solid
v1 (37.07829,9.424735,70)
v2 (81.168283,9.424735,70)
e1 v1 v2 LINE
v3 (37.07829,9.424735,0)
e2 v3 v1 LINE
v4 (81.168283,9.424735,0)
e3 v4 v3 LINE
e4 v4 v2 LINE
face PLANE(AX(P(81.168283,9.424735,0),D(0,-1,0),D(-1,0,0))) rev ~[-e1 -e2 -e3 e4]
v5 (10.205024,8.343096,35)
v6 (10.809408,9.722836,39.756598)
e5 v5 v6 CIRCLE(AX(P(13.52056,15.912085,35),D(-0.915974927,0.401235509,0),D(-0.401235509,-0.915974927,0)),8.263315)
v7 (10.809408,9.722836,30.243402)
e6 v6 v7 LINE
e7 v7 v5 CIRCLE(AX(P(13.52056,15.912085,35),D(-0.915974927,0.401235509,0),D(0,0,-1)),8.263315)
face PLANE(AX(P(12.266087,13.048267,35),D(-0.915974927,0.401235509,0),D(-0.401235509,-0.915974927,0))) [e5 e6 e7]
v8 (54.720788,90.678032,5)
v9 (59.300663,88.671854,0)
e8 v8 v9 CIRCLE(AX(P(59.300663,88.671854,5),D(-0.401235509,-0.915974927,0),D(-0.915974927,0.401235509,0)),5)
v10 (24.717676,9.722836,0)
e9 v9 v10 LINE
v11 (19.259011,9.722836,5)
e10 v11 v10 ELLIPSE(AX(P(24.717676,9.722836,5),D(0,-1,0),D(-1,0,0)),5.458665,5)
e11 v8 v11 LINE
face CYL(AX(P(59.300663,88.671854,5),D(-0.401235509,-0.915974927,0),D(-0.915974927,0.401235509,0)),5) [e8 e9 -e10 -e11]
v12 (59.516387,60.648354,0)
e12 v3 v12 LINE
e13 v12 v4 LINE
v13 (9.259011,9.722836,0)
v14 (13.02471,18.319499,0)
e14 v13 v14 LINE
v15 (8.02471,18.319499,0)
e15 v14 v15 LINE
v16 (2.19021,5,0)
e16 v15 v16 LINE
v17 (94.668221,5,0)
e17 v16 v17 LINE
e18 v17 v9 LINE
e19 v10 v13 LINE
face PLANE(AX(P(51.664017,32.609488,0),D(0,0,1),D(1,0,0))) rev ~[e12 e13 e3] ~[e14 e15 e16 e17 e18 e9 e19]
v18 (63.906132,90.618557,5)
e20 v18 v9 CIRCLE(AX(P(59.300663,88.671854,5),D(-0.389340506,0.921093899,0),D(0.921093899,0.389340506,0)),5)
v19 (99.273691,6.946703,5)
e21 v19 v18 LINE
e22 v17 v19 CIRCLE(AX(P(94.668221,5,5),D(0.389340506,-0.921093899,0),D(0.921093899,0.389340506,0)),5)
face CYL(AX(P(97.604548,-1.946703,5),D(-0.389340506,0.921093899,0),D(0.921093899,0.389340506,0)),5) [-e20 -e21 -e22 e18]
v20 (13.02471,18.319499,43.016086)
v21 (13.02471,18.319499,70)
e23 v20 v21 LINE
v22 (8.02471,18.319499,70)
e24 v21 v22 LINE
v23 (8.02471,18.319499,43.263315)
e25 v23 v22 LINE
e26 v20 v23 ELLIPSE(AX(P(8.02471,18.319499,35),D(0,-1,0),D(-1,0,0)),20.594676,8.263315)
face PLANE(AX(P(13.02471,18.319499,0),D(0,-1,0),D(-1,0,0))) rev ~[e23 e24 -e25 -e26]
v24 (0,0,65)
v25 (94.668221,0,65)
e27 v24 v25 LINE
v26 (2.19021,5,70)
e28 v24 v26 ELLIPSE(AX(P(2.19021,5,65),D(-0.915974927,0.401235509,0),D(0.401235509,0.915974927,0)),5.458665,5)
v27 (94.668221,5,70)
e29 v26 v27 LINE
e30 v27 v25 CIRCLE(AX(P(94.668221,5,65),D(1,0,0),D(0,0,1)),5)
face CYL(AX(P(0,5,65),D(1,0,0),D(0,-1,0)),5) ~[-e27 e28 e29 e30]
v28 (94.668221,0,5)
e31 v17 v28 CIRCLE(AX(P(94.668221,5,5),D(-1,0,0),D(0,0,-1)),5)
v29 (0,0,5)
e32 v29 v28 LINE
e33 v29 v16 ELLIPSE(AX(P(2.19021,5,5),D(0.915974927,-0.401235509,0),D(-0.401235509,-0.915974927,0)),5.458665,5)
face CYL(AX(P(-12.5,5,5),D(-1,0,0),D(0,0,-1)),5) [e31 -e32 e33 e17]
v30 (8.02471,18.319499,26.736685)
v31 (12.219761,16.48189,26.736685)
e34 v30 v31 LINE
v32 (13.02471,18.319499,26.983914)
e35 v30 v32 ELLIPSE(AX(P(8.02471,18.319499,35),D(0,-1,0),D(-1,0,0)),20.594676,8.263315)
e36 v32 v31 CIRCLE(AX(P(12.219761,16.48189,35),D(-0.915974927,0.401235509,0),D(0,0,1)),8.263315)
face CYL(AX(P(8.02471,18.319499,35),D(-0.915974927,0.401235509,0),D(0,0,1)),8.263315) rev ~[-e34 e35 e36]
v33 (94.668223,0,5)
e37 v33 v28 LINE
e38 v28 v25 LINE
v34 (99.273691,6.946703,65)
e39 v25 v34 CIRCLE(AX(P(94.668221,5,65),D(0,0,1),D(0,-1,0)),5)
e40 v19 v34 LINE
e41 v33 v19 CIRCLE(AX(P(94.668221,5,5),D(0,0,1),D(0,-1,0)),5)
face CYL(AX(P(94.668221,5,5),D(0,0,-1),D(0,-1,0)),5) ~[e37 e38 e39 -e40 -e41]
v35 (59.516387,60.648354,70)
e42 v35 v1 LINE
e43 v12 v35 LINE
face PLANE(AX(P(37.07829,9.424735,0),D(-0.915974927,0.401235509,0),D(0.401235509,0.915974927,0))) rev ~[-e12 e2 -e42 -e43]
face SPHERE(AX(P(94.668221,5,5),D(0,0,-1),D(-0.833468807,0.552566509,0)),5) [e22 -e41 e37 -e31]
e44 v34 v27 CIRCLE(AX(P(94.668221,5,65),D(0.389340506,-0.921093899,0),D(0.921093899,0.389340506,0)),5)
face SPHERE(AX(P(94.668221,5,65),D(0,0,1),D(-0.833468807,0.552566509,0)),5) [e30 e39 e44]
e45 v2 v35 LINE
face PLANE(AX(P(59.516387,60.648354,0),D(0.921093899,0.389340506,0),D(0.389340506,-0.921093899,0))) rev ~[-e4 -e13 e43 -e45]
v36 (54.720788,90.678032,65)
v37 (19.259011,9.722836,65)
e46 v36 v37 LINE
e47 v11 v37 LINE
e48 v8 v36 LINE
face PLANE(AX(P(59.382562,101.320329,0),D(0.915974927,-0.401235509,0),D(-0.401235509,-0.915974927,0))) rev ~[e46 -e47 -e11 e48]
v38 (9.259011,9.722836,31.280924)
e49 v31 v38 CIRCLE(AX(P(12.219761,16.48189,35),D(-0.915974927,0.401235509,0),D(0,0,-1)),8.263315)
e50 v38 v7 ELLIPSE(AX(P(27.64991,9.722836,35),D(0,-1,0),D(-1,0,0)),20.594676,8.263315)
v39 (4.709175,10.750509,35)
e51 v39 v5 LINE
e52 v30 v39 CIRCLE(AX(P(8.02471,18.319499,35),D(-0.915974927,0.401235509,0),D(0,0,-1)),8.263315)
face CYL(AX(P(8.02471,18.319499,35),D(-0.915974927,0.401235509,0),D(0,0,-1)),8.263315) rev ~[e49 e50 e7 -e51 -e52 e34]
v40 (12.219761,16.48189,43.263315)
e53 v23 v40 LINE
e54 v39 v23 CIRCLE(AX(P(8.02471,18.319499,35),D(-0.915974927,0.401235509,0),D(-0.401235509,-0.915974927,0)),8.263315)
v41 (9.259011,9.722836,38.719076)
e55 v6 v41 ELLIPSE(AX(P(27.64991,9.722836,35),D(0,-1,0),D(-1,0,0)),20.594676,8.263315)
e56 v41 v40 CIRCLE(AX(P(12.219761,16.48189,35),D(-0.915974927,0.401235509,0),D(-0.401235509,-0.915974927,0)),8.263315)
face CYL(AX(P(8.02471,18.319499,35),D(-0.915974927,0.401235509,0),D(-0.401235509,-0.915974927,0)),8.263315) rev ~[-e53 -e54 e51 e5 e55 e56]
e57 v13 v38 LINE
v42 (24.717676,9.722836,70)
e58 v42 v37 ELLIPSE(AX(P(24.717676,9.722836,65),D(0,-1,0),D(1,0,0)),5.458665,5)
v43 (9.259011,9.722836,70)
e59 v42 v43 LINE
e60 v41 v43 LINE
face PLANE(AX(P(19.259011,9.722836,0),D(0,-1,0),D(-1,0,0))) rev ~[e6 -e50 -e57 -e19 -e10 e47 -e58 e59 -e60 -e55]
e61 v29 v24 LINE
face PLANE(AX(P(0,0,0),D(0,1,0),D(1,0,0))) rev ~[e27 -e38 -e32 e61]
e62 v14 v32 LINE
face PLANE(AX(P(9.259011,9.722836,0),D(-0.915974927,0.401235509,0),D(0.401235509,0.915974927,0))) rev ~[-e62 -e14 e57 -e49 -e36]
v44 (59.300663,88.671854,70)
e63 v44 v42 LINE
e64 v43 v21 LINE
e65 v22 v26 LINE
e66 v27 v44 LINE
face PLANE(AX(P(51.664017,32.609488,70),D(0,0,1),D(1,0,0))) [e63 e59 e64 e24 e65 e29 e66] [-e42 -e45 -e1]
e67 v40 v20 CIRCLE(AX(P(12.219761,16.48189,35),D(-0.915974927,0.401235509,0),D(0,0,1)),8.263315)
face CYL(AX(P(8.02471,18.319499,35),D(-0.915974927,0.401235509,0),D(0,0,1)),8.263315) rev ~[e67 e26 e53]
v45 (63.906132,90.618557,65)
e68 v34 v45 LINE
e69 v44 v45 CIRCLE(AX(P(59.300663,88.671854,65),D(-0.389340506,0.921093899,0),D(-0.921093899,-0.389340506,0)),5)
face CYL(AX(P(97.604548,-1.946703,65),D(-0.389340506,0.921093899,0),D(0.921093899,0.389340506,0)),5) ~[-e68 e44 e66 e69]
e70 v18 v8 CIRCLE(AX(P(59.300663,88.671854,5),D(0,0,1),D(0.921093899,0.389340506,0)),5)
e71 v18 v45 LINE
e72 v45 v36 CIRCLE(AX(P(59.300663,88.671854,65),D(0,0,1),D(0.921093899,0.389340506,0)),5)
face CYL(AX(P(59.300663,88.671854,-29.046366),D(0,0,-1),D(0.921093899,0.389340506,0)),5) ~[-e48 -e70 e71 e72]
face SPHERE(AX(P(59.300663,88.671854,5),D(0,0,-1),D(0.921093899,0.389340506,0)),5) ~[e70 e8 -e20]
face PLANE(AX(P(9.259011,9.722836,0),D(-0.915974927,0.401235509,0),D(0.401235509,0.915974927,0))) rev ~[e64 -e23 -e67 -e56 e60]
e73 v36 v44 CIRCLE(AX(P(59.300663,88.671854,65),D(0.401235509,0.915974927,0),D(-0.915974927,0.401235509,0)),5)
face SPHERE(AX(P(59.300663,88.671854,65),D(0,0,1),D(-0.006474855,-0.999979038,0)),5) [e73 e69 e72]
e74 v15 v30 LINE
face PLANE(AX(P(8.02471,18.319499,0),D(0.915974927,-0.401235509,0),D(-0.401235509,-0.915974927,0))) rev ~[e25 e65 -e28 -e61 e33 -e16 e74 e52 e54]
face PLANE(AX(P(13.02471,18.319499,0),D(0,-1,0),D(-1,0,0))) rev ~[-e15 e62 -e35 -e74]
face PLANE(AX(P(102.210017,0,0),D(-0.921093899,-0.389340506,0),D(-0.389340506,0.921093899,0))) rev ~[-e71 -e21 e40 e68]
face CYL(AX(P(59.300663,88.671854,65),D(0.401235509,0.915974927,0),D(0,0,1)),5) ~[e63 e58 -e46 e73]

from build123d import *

# Parameters (mm, degrees)
F1_DEPTH     = 70
F2_R         = 5
F3_T1_DEPTH  = 94.0463660375
F3_T6_DEPTH  = 5
F3_T12_DEPTH = 100.881453585
F4_R         = 5
F5_T1_DEPTH  = 107.1682211358
F5_T3_DEPTH  = 60
F5_T8_DEPTH  = 5
F5_T14_DEPTH = 5
F7_DEPTH     = 6
F9_DEPTH     = 70.001


# Not quite as in the source:
# - a fillet or chamfer that OpenCascade refuses, or shapes differently, is made with other operations: its cross-section is extruded or revolved along the edge and cut away or added


with BuildPart() as f1:
    # F0 (on Top) → F1 (new body)
    with BuildSketch(Plane.XY):
        Polygon((8.0247101811, 18.3194985333), (0, 0), (102.2100174067, 0), (59.3825617324, 101.3203288608), (19.2590108271, 9.7228361946), (9.2590108271, 9.7228361946), (13.0247101811, 18.3194985333), align=None)
    extrude(amount=F1_DEPTH)

    # F2
    f2_edges = [f1.edges().sort_by_distance(p)[0] for p in [
        (80.79629, 50.660164, 70),
        (51.105009, 0, 70),
    ]]
    fillet(f2_edges, radius=F2_R)

    # F3: fillet of radius 5 on 2 edges, made by hand

    # F3_s2 → F3_t1 (cut)
    with BuildSketch(Plane.XY.offset(-29.0463660375)):
        with BuildLine():
            ThreePointArc((63.9061324741, 90.6185566458), (59.3330372536, 93.6717493047), (54.7207883471, 90.6780316604))
            Line((54.7207883471, 90.6780316604), (59.3825617324, 101.3203288608))
            Line((59.3825617324, 101.3203288608), (63.9061324741, 90.6185566458))
        make_face()
    extrude(amount=F3_T1_DEPTH, mode=Mode.SUBTRACT)


with BuildPart() as f3_tool4:
    # F3_s5 → F3_t6 (new body)
    with BuildSketch(Plane.XY.offset(65)):
        Polygon((59.3006629805, 88.6718541152), (63.9061324741, 90.6185566458), (59.3825617324, 101.3203288608), (54.7207883471, 90.6780316604), align=None)
    extrude(amount=F3_T6_DEPTH)

    # F3_s7 → F3_t8 (revolve, cut)
    with BuildSketch(Plane(origin=(59.3006629805, 88.6718541152, 65), x_dir=(-0.0064748546, -0.9999790379, 0), z_dir=(-0.9999790379, 0.0064748546, 0))):
        with BuildLine():
            ThreePointArc((0, -5), (5, 0), (0, 5))
            Line((0, 5), (0, -5))
        make_face()
    revolve(axis=Axis((59.3006629805, 88.6718541152, 65), (0, 0, 1)), mode=Mode.SUBTRACT)


with BuildPart() as f1_1:
    add(f1.part)

    # F3_t3: cut F3_tool4
    add(f3_tool4.part, mode=Mode.SUBTRACT)


with BuildPart() as f3_tool10:
    # F3_s11 → F3_t12 (new body)
    with BuildSketch(Plane(origin=(42.135637353, 96.1908566501, 0), x_dir=(0, 0, 1), z_dir=(-0.4012355091, -0.9159749267, 0))):
        with BuildLine():
            ThreePointArc((70, -18.7396238999), (68.5355339059, -15.204089994), (65, -13.7396238999))
            Line((65, -13.7396238999), (70, -13.7396238999))
            Line((70, -13.7396238999), (70, -18.7396238999))
        make_face()
    extrude(amount=F3_T12_DEPTH)

    split(bisect_by=Plane.XZ.offset(-9.7228361946), keep=Keep.BOTTOM)


with BuildPart() as f1_2:
    add(f1_1.part)

    # F3_t9: cut F3_tool10
    add(f3_tool10.part, mode=Mode.SUBTRACT)

    # F4
    f4_edges = [f1_2.edges().sort_by_distance(p)[0] for p in [
        (83.058075, 45.309278, 0),
        (36.9899, 50.200434, 0),
    ]]
    fillet(f4_edges, radius=F4_R)

    # F5: fillet of radius 5 on 1 edges, made by hand

    # F5_s2 → F5_t1 (cut)
    with BuildSketch(Plane.YZ.offset(-12.5)):
        with BuildLine():
            ThreePointArc((5, 0), (1.4644660941, 1.4644660941), (0, 5))
            Line((0, 5), (0, 0))
            Line((0, 0), (5, 0))
        make_face()
    extrude(amount=F5_T1_DEPTH, mode=Mode.SUBTRACT)

    # F5_s4 → F5_t3 (cut)
    with BuildSketch(Plane.XY.offset(5)):
        with BuildLine():
            ThreePointArc((94.6682211358, 0), (98.8355651733, 2.2371674547), (99.2736906295, 6.9467025307))
            Line((99.2736906295, 6.9467025307), (102.2100174067, 0))
            Line((102.2100174067, 0), (94.6682211358, 0))
        make_face()
    extrude(amount=F5_T3_DEPTH, mode=Mode.SUBTRACT)


with BuildPart() as f5_tool6:
    # F5_s7 → F5_t8 (new body)
    with BuildSketch(Plane.XY.offset(65)):
        Polygon((94.6682211358, 5), (94.6682211358, 0), (102.2100174067, 0), (99.2736906295, 6.9467025307), align=None)
    extrude(amount=F5_T8_DEPTH)

    # F5_s9 → F5_t10 (revolve, cut)
    with BuildSketch(Plane(origin=(94.6682211358, 5, 65), x_dir=(-0.8334688075, 0.5525665091, 0), z_dir=(0.5525665091, 0.8334688075, 0))):
        with BuildLine():
            ThreePointArc((0, -5), (5, 0), (0, 5))
            Line((0, 5), (0, -5))
        make_face()
    revolve(axis=Axis((94.6682211358, 5, 65), (0, 0, 1)), mode=Mode.SUBTRACT)


with BuildPart() as f1_3:
    add(f1_2.part)

    # F5_t5: cut F5_tool6
    add(f5_tool6.part, mode=Mode.SUBTRACT)


with BuildPart() as f5_tool12:
    # F5_s13 → F5_t14 (new body)
    with BuildSketch(Plane.XY.offset(5)):
        Polygon((94.6682211358, 5), (99.2736906295, 6.9467025307), (102.2100174067, 0), (94.6682211358, 0), align=None)
    extrude(amount=-F5_T14_DEPTH)

    # F5_s15 → F5_t16 (revolve, cut)
    with BuildSketch(Plane(origin=(94.6682211358, 5, 5), x_dir=(-0.8334688075, 0.5525665091, 0), z_dir=(-0.5525665091, -0.8334688075, 0))):
        with BuildLine():
            ThreePointArc((0, -5), (5, 0), (0, 5))
            Line((0, 5), (0, -5))
        make_face()
    revolve(axis=Axis((94.6682211358, 5, 5), (0, 0, -1)), mode=Mode.SUBTRACT)


with BuildPart() as f1_4:
    add(f1_3.part)

    # F5_t11: cut F5_tool12
    add(f5_tool12.part, mode=Mode.SUBTRACT)

    # F6 (on face) → F7 (cut)
    with BuildSketch(Plane(origin=(0, 0, 0), x_dir=(-0.4012355091, -0.9159749267, 0), z_dir=(-0.9159749267, 0.4012355091, 0))):
        with BuildLine():
            ThreePointArc((-20, 26.7366848613), (-14.1569538303, 29.1569538303), (-11.7366848613, 35))
            ThreePointArc((-11.7366848613, 35), (-14.1569538303, 40.8430461697), (-20, 43.2633151387))
            Line((-20, 43.2633151387), (-20, 26.7366848613))
        make_face()
        with BuildLine():
            Line((-20, 26.7366848613), (-20, 43.2633151387))
            ThreePointArc((-20, 43.2633151387), (-28.2633151387, 35), (-20, 26.7366848613))
        make_face()
    extrude(amount=-F7_DEPTH, mode=Mode.SUBTRACT)

    # F8 (on face) → F9 (cut, through all)
    with BuildSketch(Plane(origin=(0, 0, 0), x_dir=(1, 0, 0), z_dir=(0, 0, -1))):
        Polygon((81.168283108, -9.4247354642), (37.0782896005, -9.4247354642), (59.5163869294, -60.6483537421), align=None)
    extrude(amount=-F9_DEPTH, mode=Mode.SUBTRACT)


solid = f1_4.part
